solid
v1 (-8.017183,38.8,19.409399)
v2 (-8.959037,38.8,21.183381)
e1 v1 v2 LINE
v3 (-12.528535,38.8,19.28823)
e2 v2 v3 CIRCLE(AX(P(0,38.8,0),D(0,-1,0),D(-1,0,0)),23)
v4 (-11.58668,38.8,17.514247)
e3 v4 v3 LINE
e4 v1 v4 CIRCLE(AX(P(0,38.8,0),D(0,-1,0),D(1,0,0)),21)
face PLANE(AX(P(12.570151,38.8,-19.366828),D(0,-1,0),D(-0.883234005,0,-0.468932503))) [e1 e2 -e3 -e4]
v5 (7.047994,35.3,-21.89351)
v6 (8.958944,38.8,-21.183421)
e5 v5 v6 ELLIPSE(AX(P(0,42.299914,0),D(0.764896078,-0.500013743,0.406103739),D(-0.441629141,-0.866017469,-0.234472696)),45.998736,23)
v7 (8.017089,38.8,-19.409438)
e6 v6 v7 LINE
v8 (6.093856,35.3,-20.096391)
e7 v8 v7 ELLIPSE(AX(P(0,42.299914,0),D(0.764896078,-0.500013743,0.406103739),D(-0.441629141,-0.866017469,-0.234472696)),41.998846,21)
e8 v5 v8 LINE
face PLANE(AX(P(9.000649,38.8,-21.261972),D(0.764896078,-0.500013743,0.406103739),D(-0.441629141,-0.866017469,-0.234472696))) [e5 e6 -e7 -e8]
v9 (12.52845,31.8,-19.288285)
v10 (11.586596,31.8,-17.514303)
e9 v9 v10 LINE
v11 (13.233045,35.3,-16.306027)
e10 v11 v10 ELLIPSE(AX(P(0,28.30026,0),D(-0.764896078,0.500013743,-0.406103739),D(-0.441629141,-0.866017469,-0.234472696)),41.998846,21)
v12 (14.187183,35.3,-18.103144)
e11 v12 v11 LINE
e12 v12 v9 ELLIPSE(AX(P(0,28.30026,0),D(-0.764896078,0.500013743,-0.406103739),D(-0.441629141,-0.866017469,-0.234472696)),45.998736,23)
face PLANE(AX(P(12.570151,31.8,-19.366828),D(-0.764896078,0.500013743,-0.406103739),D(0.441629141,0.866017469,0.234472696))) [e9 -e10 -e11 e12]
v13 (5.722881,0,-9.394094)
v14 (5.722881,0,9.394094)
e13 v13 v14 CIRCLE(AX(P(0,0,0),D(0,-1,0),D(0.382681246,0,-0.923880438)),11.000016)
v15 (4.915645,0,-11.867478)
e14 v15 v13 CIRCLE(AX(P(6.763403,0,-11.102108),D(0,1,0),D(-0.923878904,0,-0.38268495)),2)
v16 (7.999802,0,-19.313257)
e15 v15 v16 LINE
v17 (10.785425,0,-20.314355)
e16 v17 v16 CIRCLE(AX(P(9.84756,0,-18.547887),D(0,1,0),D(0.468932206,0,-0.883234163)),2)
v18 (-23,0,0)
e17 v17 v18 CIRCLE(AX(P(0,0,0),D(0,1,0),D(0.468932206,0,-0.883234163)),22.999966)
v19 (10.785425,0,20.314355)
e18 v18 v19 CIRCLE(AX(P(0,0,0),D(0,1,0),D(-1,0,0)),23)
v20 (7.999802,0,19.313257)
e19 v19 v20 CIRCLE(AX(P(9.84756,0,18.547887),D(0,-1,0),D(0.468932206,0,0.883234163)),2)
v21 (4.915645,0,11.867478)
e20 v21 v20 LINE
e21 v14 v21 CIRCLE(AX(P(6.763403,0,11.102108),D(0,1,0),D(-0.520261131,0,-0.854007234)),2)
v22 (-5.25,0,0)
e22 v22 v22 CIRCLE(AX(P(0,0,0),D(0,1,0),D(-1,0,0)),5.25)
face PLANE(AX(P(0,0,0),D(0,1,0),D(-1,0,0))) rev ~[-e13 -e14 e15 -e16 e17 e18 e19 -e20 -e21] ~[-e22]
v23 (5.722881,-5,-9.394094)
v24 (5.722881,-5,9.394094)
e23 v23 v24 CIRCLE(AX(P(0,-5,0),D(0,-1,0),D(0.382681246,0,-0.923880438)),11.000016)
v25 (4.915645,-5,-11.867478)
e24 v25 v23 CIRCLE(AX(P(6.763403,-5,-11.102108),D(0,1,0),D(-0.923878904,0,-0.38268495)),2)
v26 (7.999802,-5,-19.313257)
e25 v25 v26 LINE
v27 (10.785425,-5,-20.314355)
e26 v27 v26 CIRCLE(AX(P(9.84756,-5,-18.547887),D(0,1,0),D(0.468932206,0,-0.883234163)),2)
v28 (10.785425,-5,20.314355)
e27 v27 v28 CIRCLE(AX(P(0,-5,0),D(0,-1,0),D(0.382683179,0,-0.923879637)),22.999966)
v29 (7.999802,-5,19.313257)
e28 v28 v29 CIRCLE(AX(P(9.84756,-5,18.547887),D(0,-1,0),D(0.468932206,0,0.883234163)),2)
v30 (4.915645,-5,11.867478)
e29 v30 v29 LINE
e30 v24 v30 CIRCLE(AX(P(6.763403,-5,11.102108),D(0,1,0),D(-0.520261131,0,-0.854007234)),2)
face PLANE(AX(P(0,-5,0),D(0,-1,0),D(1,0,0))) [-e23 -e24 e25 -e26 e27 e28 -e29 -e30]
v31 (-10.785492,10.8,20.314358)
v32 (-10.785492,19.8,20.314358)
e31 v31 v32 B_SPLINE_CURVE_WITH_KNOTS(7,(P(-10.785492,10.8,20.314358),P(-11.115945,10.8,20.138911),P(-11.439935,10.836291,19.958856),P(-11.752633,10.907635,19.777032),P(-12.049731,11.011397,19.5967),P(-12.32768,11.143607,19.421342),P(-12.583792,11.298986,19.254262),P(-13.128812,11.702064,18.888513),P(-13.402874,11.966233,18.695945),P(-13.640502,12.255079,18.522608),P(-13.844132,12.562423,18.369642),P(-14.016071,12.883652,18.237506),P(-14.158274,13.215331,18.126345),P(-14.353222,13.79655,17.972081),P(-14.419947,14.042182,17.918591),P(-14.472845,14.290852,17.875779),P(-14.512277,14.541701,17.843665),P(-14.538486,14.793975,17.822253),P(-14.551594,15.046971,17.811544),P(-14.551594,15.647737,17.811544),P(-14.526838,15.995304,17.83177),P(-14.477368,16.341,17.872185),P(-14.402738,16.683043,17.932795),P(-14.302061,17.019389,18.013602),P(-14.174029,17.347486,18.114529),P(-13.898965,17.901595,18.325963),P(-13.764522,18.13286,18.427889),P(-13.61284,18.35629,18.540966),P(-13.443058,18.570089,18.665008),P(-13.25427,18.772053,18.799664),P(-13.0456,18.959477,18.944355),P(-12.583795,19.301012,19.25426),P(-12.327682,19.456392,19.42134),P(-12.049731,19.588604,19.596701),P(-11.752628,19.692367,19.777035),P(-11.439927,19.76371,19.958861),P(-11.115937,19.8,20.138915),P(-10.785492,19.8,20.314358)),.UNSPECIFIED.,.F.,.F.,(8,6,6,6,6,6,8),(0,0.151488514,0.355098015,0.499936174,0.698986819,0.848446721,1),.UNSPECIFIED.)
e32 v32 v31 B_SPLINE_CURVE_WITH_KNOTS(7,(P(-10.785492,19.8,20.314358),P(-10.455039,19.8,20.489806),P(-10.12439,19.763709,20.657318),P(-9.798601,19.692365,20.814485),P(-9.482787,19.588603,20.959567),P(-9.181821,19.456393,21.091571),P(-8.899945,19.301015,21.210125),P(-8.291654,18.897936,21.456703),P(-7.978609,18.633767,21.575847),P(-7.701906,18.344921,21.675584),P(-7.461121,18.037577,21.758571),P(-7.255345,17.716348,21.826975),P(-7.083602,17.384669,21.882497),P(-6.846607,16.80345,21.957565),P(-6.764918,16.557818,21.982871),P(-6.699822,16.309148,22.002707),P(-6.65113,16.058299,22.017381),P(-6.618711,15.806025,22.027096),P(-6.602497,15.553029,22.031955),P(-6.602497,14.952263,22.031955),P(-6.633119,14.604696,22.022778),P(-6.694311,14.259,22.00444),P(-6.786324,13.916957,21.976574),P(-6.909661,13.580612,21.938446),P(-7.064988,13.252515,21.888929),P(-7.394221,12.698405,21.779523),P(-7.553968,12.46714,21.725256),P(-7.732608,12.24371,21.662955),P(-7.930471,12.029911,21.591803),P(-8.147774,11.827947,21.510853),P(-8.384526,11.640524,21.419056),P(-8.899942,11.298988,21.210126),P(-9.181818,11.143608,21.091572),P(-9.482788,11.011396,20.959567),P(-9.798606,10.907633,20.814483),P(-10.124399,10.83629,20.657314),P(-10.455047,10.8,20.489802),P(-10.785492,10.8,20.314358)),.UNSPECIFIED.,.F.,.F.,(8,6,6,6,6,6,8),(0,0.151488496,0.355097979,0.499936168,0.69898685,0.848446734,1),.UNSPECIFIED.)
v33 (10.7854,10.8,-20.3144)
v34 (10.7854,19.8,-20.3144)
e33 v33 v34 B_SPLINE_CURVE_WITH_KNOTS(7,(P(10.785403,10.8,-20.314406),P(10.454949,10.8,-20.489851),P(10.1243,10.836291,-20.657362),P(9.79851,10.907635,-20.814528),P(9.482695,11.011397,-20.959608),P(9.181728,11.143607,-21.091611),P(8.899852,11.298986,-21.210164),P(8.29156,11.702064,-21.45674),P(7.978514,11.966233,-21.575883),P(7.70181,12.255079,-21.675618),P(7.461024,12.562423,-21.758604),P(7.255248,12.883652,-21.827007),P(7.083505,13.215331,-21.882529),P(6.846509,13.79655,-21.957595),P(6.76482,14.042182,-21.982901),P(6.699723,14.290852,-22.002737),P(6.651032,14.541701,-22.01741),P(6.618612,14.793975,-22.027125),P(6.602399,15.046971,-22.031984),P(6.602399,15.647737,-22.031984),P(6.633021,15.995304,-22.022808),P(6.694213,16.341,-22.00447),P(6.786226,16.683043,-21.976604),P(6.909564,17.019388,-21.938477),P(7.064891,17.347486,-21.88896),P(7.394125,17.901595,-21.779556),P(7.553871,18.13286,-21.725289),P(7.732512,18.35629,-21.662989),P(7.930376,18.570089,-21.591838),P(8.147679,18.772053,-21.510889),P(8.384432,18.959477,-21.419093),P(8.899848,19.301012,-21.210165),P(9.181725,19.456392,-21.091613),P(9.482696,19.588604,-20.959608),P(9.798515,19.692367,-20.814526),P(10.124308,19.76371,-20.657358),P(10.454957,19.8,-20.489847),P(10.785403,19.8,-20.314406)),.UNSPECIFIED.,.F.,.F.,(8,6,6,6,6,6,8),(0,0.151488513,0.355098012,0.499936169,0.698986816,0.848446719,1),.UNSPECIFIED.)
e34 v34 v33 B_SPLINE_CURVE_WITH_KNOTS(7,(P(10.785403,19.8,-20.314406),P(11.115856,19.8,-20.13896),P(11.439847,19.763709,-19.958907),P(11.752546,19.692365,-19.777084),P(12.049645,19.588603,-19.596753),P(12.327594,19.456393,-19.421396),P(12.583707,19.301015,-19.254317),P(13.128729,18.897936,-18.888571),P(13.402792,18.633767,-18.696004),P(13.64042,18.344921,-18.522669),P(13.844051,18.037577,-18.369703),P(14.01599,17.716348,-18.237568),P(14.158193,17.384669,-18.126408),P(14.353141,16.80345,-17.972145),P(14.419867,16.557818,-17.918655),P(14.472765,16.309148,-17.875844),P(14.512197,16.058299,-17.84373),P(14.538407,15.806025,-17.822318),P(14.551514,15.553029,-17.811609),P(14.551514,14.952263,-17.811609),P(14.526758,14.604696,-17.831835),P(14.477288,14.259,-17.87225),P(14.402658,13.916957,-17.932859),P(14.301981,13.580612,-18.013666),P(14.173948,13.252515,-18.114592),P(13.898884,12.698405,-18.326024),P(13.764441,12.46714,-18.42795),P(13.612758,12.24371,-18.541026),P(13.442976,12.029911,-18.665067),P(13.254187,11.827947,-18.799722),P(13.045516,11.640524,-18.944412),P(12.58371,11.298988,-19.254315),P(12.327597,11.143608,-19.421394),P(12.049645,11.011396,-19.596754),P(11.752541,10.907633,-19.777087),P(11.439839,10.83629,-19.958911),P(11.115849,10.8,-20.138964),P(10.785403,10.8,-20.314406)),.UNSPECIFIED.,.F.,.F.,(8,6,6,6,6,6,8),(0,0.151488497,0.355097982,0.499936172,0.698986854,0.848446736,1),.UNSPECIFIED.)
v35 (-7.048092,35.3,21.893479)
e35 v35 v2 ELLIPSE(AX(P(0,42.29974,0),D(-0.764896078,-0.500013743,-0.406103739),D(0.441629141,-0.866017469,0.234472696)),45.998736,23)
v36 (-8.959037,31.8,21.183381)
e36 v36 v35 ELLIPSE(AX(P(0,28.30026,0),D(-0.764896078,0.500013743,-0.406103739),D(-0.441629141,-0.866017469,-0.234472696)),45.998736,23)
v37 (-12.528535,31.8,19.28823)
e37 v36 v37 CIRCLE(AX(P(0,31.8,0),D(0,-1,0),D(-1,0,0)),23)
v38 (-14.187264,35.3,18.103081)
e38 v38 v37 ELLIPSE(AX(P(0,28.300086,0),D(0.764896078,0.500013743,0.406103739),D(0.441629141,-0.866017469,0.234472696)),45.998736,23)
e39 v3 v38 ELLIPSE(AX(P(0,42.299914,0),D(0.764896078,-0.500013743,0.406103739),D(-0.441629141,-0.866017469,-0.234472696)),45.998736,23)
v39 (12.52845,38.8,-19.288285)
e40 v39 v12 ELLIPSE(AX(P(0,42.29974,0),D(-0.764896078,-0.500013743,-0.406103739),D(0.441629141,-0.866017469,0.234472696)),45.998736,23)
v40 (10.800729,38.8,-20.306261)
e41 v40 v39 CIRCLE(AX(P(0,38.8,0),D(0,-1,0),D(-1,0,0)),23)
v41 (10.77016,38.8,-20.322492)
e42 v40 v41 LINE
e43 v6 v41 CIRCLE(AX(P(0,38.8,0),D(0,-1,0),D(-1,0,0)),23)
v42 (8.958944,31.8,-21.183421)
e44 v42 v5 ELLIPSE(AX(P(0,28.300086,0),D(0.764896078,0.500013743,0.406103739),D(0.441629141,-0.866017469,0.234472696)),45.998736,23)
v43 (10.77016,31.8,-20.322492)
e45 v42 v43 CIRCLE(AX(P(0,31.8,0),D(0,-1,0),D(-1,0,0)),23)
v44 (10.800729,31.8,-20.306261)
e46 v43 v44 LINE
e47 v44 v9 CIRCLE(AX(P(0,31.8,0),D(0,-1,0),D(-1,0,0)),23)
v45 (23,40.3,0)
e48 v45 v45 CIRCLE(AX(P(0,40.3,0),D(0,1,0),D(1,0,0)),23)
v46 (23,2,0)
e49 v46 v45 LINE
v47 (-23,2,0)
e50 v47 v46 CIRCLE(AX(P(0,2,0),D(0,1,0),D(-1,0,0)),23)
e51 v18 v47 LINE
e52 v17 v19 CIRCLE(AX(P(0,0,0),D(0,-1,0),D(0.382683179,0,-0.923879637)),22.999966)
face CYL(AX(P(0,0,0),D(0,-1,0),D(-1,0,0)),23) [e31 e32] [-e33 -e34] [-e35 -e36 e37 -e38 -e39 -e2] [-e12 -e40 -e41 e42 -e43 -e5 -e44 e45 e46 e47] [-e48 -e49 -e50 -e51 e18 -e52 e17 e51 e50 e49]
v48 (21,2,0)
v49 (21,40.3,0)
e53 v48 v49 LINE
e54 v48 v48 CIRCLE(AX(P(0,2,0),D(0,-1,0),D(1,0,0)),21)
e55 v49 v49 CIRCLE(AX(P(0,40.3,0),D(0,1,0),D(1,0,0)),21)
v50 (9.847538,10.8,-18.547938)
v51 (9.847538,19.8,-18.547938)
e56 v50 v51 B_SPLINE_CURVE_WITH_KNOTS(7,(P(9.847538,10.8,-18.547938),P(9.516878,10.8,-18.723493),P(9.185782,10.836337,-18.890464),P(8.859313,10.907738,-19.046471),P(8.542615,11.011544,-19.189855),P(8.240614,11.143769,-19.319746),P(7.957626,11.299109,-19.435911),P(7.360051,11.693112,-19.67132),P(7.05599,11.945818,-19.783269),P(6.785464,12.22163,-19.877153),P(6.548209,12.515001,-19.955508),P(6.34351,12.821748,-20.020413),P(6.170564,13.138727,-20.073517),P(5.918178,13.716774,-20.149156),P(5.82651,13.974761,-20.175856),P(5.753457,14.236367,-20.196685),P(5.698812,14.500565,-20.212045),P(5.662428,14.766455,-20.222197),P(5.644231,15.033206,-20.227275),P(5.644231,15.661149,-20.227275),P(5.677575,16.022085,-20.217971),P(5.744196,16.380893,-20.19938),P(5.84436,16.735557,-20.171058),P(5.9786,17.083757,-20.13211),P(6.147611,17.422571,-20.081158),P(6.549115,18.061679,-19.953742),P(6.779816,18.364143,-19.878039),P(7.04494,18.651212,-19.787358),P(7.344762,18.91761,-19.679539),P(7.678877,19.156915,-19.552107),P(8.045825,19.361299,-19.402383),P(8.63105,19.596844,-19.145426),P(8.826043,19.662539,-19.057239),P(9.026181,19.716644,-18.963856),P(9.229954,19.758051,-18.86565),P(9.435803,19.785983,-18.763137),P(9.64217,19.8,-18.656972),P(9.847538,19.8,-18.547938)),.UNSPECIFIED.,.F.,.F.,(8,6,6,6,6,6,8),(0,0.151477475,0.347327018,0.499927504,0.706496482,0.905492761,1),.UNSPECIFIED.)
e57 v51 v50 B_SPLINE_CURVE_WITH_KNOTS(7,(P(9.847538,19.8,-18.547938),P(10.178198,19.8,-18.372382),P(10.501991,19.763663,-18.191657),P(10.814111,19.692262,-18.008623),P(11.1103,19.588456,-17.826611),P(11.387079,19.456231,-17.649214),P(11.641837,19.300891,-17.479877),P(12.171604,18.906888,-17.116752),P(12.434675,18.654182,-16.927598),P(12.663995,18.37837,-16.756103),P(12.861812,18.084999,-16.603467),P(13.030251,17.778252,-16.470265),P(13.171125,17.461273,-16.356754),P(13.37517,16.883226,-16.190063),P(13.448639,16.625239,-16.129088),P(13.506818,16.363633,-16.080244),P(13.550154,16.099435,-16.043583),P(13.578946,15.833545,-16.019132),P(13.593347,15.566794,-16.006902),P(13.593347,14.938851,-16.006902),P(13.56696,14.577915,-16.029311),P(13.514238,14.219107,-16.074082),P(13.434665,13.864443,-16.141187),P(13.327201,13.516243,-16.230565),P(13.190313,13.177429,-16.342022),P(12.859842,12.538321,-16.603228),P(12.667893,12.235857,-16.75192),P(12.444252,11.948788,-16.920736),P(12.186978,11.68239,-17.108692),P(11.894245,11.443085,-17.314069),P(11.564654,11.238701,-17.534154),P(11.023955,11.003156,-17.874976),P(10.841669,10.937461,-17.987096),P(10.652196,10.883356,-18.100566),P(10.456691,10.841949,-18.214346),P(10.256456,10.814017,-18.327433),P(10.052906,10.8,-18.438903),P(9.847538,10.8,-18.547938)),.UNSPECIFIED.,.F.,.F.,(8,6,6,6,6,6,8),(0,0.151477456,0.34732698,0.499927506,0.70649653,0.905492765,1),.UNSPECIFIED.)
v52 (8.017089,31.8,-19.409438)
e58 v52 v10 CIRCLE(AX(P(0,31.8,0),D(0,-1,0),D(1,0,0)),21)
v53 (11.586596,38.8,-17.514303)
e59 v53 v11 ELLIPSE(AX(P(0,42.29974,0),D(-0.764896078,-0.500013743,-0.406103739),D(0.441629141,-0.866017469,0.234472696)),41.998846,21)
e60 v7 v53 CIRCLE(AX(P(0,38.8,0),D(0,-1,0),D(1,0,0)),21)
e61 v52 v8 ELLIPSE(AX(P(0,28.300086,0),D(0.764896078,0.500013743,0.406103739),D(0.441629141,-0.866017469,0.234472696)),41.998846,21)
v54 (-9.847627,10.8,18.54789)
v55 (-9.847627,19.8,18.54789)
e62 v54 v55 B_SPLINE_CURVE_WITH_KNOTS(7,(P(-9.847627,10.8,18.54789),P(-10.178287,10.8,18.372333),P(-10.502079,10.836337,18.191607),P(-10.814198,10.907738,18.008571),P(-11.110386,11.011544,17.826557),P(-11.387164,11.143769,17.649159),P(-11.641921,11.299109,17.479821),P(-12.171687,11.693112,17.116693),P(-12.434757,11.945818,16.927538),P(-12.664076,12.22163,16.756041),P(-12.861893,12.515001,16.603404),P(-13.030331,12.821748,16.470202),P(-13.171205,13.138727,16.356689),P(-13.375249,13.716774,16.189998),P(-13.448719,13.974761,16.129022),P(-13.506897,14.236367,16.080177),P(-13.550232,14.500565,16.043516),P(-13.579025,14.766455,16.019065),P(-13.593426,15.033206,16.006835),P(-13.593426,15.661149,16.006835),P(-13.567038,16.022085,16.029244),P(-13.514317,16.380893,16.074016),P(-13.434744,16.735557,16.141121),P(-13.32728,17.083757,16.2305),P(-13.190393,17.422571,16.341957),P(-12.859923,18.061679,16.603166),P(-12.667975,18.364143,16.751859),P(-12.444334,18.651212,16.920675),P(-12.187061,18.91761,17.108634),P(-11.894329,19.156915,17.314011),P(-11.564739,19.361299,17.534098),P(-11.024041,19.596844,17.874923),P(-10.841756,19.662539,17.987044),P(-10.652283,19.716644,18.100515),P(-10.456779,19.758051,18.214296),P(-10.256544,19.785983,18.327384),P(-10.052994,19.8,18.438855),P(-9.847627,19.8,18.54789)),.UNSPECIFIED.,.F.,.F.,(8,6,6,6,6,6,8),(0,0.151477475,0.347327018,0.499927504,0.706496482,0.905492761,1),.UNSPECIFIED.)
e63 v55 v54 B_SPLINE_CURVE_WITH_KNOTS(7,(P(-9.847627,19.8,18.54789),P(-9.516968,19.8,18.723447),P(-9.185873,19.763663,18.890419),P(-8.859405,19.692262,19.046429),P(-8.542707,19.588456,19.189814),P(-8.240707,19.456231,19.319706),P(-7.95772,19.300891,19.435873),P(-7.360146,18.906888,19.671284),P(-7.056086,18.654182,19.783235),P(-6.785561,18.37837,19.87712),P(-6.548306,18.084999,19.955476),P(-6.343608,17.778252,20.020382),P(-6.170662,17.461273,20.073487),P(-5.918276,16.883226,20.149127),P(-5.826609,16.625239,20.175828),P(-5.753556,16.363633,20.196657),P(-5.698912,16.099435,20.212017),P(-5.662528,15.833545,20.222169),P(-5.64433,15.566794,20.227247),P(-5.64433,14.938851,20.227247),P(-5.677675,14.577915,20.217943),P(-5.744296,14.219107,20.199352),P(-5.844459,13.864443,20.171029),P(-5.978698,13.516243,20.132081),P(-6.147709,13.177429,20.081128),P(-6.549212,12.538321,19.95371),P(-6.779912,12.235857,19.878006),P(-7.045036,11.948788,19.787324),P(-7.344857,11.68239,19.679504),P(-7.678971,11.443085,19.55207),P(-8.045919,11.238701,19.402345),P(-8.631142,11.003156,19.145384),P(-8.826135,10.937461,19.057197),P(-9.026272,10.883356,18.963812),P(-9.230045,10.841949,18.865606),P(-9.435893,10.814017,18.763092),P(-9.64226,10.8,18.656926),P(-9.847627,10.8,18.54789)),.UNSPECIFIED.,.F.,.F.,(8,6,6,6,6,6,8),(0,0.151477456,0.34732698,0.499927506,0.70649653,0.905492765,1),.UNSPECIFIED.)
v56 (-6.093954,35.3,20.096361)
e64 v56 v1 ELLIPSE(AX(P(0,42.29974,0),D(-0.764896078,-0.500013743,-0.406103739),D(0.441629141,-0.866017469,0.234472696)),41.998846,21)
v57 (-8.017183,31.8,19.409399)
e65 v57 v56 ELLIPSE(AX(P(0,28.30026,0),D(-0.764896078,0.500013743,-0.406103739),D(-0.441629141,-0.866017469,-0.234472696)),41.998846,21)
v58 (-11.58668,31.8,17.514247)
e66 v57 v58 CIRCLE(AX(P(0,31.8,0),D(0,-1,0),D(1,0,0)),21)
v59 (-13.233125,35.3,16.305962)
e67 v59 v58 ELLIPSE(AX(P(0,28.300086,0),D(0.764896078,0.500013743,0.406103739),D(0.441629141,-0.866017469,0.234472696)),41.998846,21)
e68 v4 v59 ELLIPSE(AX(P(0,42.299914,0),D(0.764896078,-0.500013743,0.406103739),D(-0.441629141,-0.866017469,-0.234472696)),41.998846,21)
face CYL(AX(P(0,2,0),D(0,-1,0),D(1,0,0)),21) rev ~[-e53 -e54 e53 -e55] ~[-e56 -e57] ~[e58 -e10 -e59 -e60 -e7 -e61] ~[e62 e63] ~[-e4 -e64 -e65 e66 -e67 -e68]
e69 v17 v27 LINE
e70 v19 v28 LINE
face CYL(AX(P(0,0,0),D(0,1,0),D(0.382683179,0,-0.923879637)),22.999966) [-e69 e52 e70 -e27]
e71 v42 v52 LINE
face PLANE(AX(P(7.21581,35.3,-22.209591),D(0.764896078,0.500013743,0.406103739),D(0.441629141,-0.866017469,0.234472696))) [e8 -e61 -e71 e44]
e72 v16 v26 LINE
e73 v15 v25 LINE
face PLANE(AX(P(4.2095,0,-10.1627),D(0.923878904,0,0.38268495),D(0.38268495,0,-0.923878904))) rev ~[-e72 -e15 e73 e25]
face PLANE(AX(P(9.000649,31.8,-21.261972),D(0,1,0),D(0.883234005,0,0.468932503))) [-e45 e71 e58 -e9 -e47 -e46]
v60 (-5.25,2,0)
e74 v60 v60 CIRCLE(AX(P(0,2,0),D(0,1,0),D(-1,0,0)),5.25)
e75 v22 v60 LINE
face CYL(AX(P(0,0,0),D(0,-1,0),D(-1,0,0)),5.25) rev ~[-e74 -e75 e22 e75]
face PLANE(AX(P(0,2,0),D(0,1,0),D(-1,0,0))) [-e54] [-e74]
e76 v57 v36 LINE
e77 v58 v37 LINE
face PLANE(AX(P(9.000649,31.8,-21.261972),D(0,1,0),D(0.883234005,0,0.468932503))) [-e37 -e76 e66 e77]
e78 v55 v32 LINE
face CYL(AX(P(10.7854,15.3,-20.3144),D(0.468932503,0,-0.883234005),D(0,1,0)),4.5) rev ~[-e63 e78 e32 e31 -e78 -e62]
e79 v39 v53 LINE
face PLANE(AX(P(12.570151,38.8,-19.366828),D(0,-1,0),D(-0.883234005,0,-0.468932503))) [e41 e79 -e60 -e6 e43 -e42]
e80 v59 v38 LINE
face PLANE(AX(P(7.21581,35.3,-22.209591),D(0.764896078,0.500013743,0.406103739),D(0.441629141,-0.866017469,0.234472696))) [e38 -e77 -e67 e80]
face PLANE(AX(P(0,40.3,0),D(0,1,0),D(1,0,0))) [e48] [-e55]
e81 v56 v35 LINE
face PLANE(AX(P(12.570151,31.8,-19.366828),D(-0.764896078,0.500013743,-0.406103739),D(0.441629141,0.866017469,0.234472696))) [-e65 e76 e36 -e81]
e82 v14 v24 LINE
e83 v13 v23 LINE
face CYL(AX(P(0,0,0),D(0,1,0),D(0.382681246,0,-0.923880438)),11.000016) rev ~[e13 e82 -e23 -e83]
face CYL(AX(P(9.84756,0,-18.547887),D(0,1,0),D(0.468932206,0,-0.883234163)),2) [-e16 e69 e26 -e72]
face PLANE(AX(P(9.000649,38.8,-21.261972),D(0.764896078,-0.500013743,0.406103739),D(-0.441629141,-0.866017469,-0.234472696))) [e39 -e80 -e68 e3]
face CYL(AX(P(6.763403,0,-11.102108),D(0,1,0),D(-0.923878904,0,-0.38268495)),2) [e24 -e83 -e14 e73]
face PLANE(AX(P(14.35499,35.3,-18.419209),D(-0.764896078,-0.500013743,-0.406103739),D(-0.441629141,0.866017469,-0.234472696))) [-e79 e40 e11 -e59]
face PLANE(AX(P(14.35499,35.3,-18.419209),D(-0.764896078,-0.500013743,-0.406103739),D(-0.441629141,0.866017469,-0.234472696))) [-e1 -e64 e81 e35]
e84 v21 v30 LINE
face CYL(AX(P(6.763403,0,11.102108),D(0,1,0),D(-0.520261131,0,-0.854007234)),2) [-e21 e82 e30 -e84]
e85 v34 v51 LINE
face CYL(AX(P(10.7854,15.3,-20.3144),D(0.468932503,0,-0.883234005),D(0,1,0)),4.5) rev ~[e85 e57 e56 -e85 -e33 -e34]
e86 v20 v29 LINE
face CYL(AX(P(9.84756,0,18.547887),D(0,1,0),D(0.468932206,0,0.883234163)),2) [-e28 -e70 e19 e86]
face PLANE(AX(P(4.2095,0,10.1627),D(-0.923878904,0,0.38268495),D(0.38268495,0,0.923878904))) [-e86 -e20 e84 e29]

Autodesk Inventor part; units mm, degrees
ref_plane "YZ Plane" through (0, 0, 0) normal (1, 0, 0) x (0, 1, 0)
ref_plane "XZ Plane" through (0, 0, 0) normal (0, 1, 0) x (-1, 0, 0)
ref_plane "XY Plane" through (0, 0, 0) normal (0, 0, 1) x (1, 0, 0)
sketch "Sketch1" plane through (0, 0, 0) normal (0, 1, 0) x (-1, 0, 0)
  circle A0 centre (0, 0) radius 23
  circle A1 centre (0, 0) radius 5.25
  dimension "d0" = 46
  dimension "d3" = 10.5
extrude "Extrusion1" add sketch "Sketch1" along normal blind 2
sketch "Sketch2" plane through (0, 2, 0) normal (0, 1, 0) x (1, 0, 0)
  circle A0 centre (0, 0) radius 21
  circle A1 centre (0, 0) radius 23 projected
  line L0 (0, -23) -> (0, -21)
  line L1 (0, 21) -> (0, 23)
  dimension "d4" = 42
extrude "Extrusion2" add sketch "Sketch2" along normal blind 38.3 contours A0 L1 A1 L0 | A0 L0 A1 L1
sketch "Sketch4" plane through (0, 0, 0) normal (0, -1, 0) x (1, 0, 0)
  circle A0 centre (0, 0) radius 5.25 projected
  arc A1 (6.5056, -15.706) -> (6.5056, 15.706) centre (0, 0) ccw construction
  arc A2 (8.8017, -21.2492) -> (8.8017, 21.2492) centre (0, 0) ccw
  arc A3 (4.2095, -10.1627) -> (4.2095, 10.1627) centre (0, 0) ccw
  arc A4 (4.2095, -10.1627) -> (8.8017, -21.2492) centre (6.5056, -15.706) ccw
  arc A5 (8.8017, 21.2492) -> (4.2095, 10.1627) centre (6.5056, 15.706) ccw
  line L0 (0, 0) -> (6.5056, 15.706) construction
  line L1 (0, 0) -> (17, 0) construction
  line L2 (0, 0) -> (6.5056, -15.706) construction
  line L3 (4.2095, -10.1627) -> (8.8017, -21.2492)
  line L4 (4.2095, 10.1627) -> (8.8017, 21.2492)
  dimension "d13" = 17
  dimension "d14" = 67.5
  dimension "d15" = 135
  dimension "d16" = 12
extrude "Extrusion4" add sketch "Sketch4" along normal blind 5 contours L3 A3 L4 A2
fillet "Fillet1" radius 2 4 edges at (4.2095, -2.5, -10.1627) (8.8017, -2.5, -21.2492) (4.2095, -2.5, 10.1627) (8.8017, -2.5, 21.2492)
ref_plane "Work Plane1" through (10.7854, 0, -20.3144) normal (0.4689325, 0, -0.883234) x (0, 1, 0)
sketch "Sketch5" plane through (10.7854, 0, -20.3144) normal (0.4689325, 0, -0.883234) x (0, 1, 0)
  line L0 (40.3, -23) -> (40.3, 23) projected
  line L1 (31.8, -2.0207) -> (31.8, 2.0207)
  line L2 (31.8, 2.0207) -> (35.3, 4.0415)
  line L3 (35.3, 4.0415) -> (38.8, 2.0207)
  line L4 (38.8, 2.0207) -> (38.8, -2.0207)
  line L5 (38.8, -2.0207) -> (35.3, -4.0415)
  line L6 (35.3, -4.0415) -> (31.8, -2.0207)
  point P0 (0, 0)
  point P1 (35.3, 0)
  point P2 (40.3, 0)
  dimension "d21" = 7
  dimension "d22" = 5
  dimension "d23" = 0
extrude "Extrusion5" cut sketch "Sketch5" against normal through all
sketch "Sketch6" plane through (10.7854, 0, -20.3144) normal (0.4689325, 0, -0.883234) x (0, 1, 0)
  line L0 (0, 0) -> (12.5, 0)
  line L1 (12.5, 0) -> (15.3, 0)
  circle A0 centre (15.3, 0) radius 4.5
  dimension "d26" = 12.5
  dimension "d28" = 2.8
  dimension "d29" = 9
extrude "Extrusion6" cut sketch "Sketch6" against normal through all
properties part number "BasePotentiometer_3DPrint"
